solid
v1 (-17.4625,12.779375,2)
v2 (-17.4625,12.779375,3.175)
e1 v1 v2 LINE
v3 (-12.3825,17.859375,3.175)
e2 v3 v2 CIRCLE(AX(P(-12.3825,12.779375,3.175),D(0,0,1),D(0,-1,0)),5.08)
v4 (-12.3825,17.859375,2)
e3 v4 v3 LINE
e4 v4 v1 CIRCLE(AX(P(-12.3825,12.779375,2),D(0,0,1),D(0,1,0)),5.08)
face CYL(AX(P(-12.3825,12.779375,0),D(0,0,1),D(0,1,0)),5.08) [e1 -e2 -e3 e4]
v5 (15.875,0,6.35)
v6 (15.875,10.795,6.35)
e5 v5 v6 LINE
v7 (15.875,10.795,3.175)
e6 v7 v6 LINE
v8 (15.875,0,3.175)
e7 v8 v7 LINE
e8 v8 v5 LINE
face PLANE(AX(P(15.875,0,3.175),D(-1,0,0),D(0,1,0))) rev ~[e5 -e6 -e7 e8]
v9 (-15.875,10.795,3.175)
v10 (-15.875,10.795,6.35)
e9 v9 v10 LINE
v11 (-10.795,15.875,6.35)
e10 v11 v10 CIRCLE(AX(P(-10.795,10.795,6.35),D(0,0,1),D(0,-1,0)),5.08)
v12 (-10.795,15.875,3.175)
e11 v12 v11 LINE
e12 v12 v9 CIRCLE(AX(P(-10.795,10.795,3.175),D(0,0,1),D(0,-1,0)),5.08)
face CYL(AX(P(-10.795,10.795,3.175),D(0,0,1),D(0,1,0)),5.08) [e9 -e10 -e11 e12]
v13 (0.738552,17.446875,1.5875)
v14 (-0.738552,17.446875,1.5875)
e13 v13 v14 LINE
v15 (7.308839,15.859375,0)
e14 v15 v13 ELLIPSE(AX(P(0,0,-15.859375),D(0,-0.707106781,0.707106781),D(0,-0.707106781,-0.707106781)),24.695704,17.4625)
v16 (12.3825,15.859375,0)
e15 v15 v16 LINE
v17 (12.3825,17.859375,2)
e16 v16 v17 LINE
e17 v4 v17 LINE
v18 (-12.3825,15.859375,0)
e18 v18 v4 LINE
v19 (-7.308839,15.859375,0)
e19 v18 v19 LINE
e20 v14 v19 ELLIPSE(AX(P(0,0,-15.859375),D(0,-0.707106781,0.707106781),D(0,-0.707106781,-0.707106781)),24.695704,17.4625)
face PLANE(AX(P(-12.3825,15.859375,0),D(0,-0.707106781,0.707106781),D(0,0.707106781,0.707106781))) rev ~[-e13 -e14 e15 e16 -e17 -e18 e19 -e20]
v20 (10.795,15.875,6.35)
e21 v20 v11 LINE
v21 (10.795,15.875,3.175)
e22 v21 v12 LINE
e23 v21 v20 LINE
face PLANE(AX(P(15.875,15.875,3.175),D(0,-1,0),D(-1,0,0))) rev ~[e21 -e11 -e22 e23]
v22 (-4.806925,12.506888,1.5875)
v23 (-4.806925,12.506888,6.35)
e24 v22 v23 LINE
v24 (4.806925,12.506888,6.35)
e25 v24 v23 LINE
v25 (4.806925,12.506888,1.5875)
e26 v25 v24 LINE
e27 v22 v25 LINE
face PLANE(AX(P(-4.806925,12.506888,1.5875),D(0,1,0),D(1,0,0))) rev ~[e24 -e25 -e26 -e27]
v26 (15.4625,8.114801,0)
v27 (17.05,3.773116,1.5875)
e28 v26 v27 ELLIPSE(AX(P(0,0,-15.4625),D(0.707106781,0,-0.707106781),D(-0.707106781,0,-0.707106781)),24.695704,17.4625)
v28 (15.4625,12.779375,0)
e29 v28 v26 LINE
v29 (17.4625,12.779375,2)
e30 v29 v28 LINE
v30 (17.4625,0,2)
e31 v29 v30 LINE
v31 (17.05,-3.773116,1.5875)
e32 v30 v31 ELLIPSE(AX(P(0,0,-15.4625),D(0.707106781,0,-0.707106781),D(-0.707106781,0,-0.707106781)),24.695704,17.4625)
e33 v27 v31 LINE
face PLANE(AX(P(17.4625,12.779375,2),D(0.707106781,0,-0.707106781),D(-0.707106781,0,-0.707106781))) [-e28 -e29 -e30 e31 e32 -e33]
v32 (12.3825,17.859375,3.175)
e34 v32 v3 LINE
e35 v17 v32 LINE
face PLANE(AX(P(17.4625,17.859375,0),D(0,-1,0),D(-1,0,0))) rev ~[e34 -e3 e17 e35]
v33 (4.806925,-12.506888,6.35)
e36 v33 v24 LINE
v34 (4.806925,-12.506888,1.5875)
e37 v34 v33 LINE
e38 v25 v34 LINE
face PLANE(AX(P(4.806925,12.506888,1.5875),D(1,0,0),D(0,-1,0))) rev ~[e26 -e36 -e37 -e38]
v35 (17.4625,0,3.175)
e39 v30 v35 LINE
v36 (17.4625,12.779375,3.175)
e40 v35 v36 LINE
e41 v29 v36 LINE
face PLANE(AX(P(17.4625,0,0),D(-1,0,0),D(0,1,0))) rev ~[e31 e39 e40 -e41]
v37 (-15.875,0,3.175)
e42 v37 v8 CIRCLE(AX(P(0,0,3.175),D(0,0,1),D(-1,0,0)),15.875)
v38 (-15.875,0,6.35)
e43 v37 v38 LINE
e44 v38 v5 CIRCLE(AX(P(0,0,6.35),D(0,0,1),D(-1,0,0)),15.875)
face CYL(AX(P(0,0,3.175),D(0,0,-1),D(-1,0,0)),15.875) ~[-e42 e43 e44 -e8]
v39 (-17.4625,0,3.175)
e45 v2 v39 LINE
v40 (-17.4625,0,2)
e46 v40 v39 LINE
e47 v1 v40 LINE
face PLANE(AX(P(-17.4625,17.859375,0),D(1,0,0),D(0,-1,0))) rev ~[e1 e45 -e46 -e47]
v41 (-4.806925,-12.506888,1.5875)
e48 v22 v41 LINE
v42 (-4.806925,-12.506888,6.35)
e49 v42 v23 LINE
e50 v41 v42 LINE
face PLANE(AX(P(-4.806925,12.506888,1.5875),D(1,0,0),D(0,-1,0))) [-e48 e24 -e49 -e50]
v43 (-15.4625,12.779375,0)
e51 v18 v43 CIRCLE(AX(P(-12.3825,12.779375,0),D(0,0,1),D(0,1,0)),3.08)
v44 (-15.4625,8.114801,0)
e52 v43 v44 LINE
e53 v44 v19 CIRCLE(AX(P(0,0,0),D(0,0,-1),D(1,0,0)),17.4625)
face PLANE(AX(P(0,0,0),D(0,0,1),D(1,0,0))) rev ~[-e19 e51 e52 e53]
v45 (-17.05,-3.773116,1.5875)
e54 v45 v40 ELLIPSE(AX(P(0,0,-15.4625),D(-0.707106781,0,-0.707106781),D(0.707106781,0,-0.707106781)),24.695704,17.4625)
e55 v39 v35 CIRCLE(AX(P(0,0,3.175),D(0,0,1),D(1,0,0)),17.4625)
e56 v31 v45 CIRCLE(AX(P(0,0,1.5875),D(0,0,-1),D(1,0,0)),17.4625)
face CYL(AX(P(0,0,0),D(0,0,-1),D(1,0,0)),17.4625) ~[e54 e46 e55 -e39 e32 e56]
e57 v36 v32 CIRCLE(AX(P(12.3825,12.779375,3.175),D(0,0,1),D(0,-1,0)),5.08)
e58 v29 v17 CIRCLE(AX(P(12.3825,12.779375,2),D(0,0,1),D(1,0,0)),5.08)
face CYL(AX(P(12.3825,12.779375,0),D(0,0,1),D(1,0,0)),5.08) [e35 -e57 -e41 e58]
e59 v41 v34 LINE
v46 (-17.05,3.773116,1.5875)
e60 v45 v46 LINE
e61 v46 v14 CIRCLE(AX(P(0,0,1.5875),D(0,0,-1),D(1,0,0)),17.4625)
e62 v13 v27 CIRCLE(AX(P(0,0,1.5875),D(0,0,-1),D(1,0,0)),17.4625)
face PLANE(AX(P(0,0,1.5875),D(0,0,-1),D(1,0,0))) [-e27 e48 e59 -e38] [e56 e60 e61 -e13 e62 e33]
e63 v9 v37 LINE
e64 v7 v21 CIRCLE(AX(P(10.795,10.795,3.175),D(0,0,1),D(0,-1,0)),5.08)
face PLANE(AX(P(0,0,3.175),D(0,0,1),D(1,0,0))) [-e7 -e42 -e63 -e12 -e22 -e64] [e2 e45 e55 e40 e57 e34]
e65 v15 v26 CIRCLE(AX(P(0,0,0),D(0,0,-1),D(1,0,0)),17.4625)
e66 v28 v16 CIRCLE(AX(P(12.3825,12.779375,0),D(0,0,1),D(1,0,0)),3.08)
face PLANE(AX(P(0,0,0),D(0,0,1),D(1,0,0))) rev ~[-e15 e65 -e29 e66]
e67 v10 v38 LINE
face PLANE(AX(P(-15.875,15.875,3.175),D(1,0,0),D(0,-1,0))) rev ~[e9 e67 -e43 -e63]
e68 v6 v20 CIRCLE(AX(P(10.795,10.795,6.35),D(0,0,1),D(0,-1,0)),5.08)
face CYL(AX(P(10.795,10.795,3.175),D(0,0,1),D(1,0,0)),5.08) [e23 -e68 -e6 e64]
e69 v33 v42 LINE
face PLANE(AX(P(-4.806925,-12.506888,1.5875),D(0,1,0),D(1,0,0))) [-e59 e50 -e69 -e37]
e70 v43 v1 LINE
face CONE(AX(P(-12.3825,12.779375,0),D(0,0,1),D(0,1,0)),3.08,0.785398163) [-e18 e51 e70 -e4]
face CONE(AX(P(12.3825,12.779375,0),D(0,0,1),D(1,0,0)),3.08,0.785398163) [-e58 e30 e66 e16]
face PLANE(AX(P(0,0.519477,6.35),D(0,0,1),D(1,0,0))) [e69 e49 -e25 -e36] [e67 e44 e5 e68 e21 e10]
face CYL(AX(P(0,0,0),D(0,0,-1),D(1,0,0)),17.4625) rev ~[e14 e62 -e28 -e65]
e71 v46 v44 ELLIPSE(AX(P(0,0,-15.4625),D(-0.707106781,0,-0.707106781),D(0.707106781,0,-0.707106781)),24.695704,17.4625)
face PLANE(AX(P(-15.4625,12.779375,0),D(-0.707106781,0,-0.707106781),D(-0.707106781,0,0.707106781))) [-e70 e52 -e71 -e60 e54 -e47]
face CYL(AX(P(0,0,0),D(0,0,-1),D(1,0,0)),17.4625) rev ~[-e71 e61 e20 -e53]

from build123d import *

# Parameters (mm, degrees)
F1_DEPTH    = 3.175
F3_DEPTH    = 3.175
F5_DEPTH    = 1.5875
F6_W        = 9.6138492227
F6_H        = 25.0137764961
F7_DEPTH    = 25.4
F8_R        = 5.08
F9_T1_DEPTH = 21.5230971591
F9_T3_DEPTH = 24.765
F9_T6_ANGLE = 90
F9_T8_ANGLE = 90


# Not quite as in the source:
# - a fillet or chamfer that OpenCascade refuses, or shapes differently, is made with other operations: its cross-section is extruded or revolved along the edge and cut away or added


with BuildPart() as f1:
    # F0 (on Top) → F1 (new body)
    with BuildSketch(Plane.XY):
        with BuildLine():
            ThreePointArc((-17.4625, 0), (0, -17.4625), (17.4625, 0))
            ThreePointArc((17.4625, 0), (0, 17.4625), (-17.4625, 0))
        make_face()
        with BuildLine():
            ThreePointArc((-17.4625, 0), (0, 17.4625), (17.4625, 0))
            Line((17.4625, 0), (17.4625, 17.859375))
            Line((17.4625, 17.859375), (-17.4625, 17.859375))
            Line((-17.4625, 17.859375), (-17.4625, 0))
        make_face()
    extrude(amount=F1_DEPTH)

    # F2 (on face) → F3 (join)
    with BuildSketch(Plane.XY.offset(3.175)):
        with BuildLine():
            ThreePointArc((-5.44e-08, 15.875), (-11.2253201706, 11.2253201321), (-15.875, 0))
            ThreePointArc((-15.875, 0), (0, -15.875), (15.875, 0))
            ThreePointArc((15.875, 0), (11.2253201321, 11.2253201706), (-5.44e-08, 15.875))
        make_face()
        with BuildLine():
            Line((-15.875, 15.875), (-15.875, 0))
            ThreePointArc((-15.875, 0), (-11.2253201706, 11.2253201321), (-5.44e-08, 15.875))
            Line((-5.44e-08, 15.875), (-15.875, 15.875))
        make_face()
        with BuildLine():
            ThreePointArc((-5.44e-08, 15.875), (11.2253201321, 11.2253201706), (15.875, 0))
            Line((15.875, 0), (15.875, 15.875))
            Line((15.875, 15.875), (-5.44e-08, 15.875))
        make_face()
    extrude(amount=F3_DEPTH)

    # F4 (on face) → F5 (cut)
    with BuildSketch(Plane(origin=(0, 0, 0), x_dir=(1, 0, 0), z_dir=(0, 0, -1))):
        with BuildLine():
            ThreePointArc((-17.4625, 0), (0, -17.4625), (17.4625, 0))
            ThreePointArc((17.4625, 0), (0, 17.4625), (-17.4625, 0))
        make_face()
    extrude(amount=-F5_DEPTH, mode=Mode.SUBTRACT)

    # F6 (on face) → F7 (cut)
    with BuildSketch(Plane(origin=(0, 0, 1.5875), x_dir=(1, 0, 0), z_dir=(0, 0, -1))):
        Rectangle(F6_W, F6_H)
    extrude(amount=-F7_DEPTH, mode=Mode.SUBTRACT)

    # F8
    f8_edges = [f1.edges().sort_by_distance(p)[0] for p in [
        (17.4625, 17.859375, 1.5875),
        (-17.4625, 17.859375, 1.5875),
        (-15.875, 15.875, 4.7625),
        (15.875, 15.875, 4.7625),
    ]]
    fillet(f8_edges, radius=F8_R)

    # F9: chamfer of 2 on 2 edges, made by hand

    # F9_s2 → F9_t1 (cut)
    with BuildSketch(Plane.XZ.offset(-12.779375)):
        Polygon((17.4625, 2), (15.4625, 0), (17.4625, 0), align=None)
        Polygon((-15.4625, 0), (-17.4625, 2), (-17.4625, 0), align=None)
    extrude(amount=F9_T1_DEPTH, mode=Mode.SUBTRACT)

    # F9_s4 → F9_t3 (cut)
    with BuildSketch(Plane.YZ.offset(-12.3825)):
        Polygon((15.859375, 0), (17.859375, 2), (17.859375, 0), align=None)
    extrude(amount=F9_T3_DEPTH, mode=Mode.SUBTRACT)

    # F9_s5 → F9_t6 (revolve, cut)
    with BuildSketch(Plane.XZ.offset(-12.779375)):
        Polygon((15.4625, 0), (17.4625, 2), (17.4625, 0), align=None)
    revolve(axis=Axis((12.3825, 12.779375, 0), (0, 0, 1)), revolution_arc=F9_T6_ANGLE, mode=Mode.SUBTRACT)

    # F9_s7 → F9_t8 (revolve, cut)
    with BuildSketch(Plane.YZ.offset(-12.3825)):
        Polygon((15.859375, 0), (17.859375, 2), (17.859375, 0), align=None)
    revolve(axis=Axis((-12.3825, 12.779375, 0), (0, 0, 1)), revolution_arc=F9_T8_ANGLE, mode=Mode.SUBTRACT)


solid = f1.part
